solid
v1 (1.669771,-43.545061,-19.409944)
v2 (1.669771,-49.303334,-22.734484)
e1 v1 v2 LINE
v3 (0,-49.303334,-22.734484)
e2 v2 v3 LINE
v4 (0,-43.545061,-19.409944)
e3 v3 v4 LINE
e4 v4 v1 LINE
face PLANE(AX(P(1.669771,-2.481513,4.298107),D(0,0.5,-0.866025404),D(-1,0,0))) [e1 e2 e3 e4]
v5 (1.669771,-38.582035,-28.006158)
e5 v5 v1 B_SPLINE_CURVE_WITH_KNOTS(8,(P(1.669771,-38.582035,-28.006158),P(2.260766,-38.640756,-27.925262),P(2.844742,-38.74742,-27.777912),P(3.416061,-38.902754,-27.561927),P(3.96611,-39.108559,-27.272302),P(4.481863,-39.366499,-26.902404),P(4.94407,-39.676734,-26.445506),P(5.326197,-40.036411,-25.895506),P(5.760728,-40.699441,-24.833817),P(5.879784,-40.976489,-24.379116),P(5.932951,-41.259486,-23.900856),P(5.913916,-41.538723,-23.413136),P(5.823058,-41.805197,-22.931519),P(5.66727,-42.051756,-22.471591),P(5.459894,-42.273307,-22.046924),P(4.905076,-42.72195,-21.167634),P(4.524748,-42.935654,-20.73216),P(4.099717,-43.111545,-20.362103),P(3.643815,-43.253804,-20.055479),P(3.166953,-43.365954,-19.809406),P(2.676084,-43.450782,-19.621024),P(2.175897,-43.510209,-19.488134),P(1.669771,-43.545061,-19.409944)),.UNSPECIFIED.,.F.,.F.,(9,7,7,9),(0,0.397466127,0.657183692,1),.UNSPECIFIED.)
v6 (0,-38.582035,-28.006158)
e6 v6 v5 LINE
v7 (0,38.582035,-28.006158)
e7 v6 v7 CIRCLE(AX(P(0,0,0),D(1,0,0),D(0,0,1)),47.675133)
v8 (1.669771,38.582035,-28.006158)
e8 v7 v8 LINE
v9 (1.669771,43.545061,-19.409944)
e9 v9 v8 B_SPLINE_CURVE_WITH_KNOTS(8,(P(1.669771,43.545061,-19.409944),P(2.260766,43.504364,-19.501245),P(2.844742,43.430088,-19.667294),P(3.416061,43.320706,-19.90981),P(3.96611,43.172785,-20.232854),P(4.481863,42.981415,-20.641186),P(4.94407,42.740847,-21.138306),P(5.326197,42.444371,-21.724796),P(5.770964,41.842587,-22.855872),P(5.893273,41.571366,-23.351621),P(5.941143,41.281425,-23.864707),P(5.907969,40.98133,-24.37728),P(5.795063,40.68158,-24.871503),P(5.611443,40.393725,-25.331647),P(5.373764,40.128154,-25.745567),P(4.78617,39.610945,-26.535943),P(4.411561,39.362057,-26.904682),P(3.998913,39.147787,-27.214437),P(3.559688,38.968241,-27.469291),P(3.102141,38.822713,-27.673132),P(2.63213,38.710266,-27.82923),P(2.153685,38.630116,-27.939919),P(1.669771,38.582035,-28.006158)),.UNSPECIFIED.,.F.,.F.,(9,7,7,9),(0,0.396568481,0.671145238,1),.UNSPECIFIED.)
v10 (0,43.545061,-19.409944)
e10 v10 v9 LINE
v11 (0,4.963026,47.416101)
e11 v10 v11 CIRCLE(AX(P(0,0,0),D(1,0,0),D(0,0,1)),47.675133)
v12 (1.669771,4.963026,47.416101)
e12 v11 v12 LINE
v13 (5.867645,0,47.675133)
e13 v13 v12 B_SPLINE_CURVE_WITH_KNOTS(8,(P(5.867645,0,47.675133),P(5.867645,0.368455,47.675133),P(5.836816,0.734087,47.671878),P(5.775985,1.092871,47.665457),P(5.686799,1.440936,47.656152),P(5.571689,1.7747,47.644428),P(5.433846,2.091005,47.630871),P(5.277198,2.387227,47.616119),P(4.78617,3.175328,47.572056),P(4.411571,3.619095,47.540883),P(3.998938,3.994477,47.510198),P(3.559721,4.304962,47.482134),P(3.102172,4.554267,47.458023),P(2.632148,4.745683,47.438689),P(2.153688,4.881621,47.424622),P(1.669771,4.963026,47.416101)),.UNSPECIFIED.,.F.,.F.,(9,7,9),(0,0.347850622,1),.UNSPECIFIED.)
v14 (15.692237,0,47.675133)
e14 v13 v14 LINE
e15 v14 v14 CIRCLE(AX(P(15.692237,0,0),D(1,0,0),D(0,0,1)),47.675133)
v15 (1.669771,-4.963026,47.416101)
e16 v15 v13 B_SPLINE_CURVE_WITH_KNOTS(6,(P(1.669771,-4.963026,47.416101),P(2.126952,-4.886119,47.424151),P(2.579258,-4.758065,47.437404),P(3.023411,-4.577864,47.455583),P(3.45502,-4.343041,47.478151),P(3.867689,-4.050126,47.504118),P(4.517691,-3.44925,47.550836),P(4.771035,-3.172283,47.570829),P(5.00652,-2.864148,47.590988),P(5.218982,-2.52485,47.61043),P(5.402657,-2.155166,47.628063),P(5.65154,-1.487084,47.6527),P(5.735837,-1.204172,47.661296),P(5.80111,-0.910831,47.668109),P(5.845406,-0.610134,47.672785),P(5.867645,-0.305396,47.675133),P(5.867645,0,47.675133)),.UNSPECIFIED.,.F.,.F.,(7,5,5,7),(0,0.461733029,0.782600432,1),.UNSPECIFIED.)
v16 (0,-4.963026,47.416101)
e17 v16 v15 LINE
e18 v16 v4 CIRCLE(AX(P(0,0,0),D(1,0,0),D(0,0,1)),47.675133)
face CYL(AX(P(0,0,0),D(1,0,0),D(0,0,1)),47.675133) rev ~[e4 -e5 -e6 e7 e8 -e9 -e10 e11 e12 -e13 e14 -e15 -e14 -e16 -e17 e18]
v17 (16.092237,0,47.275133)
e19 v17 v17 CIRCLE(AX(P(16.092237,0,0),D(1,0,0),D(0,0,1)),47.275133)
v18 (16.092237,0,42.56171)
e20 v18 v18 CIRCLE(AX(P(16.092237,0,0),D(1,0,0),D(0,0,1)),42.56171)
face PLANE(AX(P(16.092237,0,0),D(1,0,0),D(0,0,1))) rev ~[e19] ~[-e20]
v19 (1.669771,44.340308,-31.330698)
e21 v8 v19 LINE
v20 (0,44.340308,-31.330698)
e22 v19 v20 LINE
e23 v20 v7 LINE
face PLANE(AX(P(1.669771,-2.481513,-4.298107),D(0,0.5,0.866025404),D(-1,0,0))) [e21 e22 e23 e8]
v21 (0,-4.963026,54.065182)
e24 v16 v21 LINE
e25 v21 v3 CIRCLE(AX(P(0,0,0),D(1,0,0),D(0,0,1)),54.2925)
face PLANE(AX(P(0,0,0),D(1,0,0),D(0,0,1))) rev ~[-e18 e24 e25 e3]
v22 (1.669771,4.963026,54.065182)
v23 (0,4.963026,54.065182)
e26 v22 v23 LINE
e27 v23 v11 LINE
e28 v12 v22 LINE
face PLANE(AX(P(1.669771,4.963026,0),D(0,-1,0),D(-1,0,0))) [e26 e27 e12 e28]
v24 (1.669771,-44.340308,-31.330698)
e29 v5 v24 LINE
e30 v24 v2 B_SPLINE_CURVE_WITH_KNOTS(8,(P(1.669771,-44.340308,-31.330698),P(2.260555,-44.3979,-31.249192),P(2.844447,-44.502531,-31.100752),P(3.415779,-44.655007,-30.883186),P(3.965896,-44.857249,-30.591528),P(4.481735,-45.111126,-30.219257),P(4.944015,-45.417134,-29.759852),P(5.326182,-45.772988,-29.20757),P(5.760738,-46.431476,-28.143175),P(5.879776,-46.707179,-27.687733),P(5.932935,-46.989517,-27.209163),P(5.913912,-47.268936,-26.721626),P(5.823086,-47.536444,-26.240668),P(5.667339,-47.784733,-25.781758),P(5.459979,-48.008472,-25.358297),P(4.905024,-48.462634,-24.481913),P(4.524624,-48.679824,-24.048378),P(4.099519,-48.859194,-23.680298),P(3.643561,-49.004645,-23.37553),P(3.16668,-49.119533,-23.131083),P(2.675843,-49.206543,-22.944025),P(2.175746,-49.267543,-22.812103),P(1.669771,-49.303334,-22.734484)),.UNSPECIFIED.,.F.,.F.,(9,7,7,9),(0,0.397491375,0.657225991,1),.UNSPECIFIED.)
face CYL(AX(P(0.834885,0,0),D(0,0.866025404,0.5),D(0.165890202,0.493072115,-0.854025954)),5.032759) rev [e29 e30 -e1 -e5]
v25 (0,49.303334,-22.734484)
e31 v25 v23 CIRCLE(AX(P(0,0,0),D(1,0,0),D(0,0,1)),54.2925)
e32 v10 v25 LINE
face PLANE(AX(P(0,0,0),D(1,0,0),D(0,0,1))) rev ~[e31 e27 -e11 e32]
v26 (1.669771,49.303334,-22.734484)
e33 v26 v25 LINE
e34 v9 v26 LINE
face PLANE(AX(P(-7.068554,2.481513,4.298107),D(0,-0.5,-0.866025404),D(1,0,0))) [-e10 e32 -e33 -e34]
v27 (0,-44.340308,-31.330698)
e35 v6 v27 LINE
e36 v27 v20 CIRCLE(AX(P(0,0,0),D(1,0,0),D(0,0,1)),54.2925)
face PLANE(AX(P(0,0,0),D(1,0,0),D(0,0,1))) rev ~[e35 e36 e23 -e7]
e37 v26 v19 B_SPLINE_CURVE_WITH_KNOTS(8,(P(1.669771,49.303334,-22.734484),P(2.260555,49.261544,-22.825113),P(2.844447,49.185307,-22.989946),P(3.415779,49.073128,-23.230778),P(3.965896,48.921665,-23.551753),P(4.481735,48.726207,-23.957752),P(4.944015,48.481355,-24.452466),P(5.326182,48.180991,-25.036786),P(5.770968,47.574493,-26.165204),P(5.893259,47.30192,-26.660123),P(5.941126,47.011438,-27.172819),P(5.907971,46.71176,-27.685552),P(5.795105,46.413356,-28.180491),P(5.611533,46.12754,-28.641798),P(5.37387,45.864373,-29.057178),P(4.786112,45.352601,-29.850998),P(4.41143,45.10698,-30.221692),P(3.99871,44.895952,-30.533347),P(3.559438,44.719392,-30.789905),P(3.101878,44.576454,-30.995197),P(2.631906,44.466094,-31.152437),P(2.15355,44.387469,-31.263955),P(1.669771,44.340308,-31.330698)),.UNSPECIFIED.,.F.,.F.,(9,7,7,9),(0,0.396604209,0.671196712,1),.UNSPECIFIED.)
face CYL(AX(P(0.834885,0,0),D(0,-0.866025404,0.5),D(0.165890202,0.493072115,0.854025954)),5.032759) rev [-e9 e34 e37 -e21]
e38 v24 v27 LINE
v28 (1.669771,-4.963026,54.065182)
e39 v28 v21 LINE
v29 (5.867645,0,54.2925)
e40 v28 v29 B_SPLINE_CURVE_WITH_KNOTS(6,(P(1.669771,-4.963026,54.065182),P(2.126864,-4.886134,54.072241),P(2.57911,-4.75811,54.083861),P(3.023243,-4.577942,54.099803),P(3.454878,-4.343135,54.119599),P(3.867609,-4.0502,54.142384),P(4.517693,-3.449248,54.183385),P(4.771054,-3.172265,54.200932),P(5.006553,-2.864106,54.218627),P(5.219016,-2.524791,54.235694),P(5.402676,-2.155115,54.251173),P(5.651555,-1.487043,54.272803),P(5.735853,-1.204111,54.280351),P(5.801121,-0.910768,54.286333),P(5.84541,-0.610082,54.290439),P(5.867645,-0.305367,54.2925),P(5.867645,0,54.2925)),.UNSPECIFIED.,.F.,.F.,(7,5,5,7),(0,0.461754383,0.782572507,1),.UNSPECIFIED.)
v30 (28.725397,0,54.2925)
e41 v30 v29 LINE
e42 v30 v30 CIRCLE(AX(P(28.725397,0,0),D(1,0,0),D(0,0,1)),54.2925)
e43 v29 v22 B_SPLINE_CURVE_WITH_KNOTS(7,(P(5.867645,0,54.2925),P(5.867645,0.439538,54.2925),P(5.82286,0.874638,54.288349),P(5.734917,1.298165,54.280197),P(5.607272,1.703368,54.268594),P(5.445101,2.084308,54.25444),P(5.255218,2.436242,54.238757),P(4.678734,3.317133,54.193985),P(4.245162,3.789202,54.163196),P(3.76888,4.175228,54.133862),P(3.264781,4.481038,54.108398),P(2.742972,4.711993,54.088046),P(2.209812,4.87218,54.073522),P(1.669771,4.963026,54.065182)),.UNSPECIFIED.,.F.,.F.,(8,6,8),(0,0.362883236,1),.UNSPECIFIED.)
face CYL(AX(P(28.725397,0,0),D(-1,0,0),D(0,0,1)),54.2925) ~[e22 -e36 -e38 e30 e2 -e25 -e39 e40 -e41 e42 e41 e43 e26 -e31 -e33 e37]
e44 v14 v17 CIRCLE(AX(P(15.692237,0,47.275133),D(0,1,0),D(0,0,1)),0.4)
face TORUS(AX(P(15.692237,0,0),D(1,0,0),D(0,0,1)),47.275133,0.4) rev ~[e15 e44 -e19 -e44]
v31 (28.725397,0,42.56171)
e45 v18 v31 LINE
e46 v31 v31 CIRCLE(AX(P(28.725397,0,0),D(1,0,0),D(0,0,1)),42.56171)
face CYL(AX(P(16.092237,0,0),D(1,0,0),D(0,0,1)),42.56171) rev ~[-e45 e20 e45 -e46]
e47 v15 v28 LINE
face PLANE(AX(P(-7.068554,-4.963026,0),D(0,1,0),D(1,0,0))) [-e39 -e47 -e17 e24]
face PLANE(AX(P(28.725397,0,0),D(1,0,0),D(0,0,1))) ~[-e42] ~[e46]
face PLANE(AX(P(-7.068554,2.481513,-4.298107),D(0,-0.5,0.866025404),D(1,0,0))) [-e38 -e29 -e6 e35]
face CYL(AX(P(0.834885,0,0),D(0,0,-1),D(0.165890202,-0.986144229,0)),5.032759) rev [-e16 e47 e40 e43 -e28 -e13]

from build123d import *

# Parameters (mm, degrees)
F3_DEPTH        = 73.66
F3_COPIES_COUNT = 3
F4_R            = 0.4


# Not quite as in the source:
# - a pattern or mirror of a feature is missing from the dataset's text; its kind, count and spacing are read off the source's solid


with BuildPart() as f1:
    # F0 (on Front) → F1 (revolve)
    with BuildSketch(Plane.XZ):
        Polygon((28.7253968418, 54.2925000191), (0, 54.2925000191), (0, 47.6751327515), (16.0922370851, 47.6751327515), (16.0922370851, 42.5617098808), (28.7253968418, 42.5617098808), align=None)
    revolve(axis=Axis((14.3626984209, 0, 0), (1, 0, 0)))

    # F2 (on Top) → F3 (cut)
    with BuildSketch(Plane.XY):
        with BuildLine():
            Line((1.6697708597, 4.963026382), (0, 4.963026382))
            Line((0, 4.963026382), (-7.0685544051, 4.963026382))
            Line((-7.0685544051, 4.963026382), (-7.0685544051, -4.963026382))
            Line((-7.0685544051, -4.963026382), (0, -4.963026382))
            Line((0, -4.963026382), (1.6697708597, -4.963026382))
            ThreePointArc((1.6697708597, -4.963026382), (5.8676445687, 0), (1.6697708597, 4.963026382))
        make_face()
    f3 = extrude(amount=F3_DEPTH, mode=Mode.SUBTRACT)

    # F3_copies: F3 ×3 about axis
    f3_copies_axis = Axis((0, 0, 0), (1, 0, 0))
    for i in range(1, F3_COPIES_COUNT):
        add(f3.rotate(f3_copies_axis, i * 360 / F3_COPIES_COUNT), mode=Mode.SUBTRACT)

    # F4
    f4_edges = [f1.edges().sort_by_distance(p)[0] for p in [
        (16.092237, 0, -47.675133),
    ]]
    fillet(f4_edges, radius=F4_R)


solid = f1.part
